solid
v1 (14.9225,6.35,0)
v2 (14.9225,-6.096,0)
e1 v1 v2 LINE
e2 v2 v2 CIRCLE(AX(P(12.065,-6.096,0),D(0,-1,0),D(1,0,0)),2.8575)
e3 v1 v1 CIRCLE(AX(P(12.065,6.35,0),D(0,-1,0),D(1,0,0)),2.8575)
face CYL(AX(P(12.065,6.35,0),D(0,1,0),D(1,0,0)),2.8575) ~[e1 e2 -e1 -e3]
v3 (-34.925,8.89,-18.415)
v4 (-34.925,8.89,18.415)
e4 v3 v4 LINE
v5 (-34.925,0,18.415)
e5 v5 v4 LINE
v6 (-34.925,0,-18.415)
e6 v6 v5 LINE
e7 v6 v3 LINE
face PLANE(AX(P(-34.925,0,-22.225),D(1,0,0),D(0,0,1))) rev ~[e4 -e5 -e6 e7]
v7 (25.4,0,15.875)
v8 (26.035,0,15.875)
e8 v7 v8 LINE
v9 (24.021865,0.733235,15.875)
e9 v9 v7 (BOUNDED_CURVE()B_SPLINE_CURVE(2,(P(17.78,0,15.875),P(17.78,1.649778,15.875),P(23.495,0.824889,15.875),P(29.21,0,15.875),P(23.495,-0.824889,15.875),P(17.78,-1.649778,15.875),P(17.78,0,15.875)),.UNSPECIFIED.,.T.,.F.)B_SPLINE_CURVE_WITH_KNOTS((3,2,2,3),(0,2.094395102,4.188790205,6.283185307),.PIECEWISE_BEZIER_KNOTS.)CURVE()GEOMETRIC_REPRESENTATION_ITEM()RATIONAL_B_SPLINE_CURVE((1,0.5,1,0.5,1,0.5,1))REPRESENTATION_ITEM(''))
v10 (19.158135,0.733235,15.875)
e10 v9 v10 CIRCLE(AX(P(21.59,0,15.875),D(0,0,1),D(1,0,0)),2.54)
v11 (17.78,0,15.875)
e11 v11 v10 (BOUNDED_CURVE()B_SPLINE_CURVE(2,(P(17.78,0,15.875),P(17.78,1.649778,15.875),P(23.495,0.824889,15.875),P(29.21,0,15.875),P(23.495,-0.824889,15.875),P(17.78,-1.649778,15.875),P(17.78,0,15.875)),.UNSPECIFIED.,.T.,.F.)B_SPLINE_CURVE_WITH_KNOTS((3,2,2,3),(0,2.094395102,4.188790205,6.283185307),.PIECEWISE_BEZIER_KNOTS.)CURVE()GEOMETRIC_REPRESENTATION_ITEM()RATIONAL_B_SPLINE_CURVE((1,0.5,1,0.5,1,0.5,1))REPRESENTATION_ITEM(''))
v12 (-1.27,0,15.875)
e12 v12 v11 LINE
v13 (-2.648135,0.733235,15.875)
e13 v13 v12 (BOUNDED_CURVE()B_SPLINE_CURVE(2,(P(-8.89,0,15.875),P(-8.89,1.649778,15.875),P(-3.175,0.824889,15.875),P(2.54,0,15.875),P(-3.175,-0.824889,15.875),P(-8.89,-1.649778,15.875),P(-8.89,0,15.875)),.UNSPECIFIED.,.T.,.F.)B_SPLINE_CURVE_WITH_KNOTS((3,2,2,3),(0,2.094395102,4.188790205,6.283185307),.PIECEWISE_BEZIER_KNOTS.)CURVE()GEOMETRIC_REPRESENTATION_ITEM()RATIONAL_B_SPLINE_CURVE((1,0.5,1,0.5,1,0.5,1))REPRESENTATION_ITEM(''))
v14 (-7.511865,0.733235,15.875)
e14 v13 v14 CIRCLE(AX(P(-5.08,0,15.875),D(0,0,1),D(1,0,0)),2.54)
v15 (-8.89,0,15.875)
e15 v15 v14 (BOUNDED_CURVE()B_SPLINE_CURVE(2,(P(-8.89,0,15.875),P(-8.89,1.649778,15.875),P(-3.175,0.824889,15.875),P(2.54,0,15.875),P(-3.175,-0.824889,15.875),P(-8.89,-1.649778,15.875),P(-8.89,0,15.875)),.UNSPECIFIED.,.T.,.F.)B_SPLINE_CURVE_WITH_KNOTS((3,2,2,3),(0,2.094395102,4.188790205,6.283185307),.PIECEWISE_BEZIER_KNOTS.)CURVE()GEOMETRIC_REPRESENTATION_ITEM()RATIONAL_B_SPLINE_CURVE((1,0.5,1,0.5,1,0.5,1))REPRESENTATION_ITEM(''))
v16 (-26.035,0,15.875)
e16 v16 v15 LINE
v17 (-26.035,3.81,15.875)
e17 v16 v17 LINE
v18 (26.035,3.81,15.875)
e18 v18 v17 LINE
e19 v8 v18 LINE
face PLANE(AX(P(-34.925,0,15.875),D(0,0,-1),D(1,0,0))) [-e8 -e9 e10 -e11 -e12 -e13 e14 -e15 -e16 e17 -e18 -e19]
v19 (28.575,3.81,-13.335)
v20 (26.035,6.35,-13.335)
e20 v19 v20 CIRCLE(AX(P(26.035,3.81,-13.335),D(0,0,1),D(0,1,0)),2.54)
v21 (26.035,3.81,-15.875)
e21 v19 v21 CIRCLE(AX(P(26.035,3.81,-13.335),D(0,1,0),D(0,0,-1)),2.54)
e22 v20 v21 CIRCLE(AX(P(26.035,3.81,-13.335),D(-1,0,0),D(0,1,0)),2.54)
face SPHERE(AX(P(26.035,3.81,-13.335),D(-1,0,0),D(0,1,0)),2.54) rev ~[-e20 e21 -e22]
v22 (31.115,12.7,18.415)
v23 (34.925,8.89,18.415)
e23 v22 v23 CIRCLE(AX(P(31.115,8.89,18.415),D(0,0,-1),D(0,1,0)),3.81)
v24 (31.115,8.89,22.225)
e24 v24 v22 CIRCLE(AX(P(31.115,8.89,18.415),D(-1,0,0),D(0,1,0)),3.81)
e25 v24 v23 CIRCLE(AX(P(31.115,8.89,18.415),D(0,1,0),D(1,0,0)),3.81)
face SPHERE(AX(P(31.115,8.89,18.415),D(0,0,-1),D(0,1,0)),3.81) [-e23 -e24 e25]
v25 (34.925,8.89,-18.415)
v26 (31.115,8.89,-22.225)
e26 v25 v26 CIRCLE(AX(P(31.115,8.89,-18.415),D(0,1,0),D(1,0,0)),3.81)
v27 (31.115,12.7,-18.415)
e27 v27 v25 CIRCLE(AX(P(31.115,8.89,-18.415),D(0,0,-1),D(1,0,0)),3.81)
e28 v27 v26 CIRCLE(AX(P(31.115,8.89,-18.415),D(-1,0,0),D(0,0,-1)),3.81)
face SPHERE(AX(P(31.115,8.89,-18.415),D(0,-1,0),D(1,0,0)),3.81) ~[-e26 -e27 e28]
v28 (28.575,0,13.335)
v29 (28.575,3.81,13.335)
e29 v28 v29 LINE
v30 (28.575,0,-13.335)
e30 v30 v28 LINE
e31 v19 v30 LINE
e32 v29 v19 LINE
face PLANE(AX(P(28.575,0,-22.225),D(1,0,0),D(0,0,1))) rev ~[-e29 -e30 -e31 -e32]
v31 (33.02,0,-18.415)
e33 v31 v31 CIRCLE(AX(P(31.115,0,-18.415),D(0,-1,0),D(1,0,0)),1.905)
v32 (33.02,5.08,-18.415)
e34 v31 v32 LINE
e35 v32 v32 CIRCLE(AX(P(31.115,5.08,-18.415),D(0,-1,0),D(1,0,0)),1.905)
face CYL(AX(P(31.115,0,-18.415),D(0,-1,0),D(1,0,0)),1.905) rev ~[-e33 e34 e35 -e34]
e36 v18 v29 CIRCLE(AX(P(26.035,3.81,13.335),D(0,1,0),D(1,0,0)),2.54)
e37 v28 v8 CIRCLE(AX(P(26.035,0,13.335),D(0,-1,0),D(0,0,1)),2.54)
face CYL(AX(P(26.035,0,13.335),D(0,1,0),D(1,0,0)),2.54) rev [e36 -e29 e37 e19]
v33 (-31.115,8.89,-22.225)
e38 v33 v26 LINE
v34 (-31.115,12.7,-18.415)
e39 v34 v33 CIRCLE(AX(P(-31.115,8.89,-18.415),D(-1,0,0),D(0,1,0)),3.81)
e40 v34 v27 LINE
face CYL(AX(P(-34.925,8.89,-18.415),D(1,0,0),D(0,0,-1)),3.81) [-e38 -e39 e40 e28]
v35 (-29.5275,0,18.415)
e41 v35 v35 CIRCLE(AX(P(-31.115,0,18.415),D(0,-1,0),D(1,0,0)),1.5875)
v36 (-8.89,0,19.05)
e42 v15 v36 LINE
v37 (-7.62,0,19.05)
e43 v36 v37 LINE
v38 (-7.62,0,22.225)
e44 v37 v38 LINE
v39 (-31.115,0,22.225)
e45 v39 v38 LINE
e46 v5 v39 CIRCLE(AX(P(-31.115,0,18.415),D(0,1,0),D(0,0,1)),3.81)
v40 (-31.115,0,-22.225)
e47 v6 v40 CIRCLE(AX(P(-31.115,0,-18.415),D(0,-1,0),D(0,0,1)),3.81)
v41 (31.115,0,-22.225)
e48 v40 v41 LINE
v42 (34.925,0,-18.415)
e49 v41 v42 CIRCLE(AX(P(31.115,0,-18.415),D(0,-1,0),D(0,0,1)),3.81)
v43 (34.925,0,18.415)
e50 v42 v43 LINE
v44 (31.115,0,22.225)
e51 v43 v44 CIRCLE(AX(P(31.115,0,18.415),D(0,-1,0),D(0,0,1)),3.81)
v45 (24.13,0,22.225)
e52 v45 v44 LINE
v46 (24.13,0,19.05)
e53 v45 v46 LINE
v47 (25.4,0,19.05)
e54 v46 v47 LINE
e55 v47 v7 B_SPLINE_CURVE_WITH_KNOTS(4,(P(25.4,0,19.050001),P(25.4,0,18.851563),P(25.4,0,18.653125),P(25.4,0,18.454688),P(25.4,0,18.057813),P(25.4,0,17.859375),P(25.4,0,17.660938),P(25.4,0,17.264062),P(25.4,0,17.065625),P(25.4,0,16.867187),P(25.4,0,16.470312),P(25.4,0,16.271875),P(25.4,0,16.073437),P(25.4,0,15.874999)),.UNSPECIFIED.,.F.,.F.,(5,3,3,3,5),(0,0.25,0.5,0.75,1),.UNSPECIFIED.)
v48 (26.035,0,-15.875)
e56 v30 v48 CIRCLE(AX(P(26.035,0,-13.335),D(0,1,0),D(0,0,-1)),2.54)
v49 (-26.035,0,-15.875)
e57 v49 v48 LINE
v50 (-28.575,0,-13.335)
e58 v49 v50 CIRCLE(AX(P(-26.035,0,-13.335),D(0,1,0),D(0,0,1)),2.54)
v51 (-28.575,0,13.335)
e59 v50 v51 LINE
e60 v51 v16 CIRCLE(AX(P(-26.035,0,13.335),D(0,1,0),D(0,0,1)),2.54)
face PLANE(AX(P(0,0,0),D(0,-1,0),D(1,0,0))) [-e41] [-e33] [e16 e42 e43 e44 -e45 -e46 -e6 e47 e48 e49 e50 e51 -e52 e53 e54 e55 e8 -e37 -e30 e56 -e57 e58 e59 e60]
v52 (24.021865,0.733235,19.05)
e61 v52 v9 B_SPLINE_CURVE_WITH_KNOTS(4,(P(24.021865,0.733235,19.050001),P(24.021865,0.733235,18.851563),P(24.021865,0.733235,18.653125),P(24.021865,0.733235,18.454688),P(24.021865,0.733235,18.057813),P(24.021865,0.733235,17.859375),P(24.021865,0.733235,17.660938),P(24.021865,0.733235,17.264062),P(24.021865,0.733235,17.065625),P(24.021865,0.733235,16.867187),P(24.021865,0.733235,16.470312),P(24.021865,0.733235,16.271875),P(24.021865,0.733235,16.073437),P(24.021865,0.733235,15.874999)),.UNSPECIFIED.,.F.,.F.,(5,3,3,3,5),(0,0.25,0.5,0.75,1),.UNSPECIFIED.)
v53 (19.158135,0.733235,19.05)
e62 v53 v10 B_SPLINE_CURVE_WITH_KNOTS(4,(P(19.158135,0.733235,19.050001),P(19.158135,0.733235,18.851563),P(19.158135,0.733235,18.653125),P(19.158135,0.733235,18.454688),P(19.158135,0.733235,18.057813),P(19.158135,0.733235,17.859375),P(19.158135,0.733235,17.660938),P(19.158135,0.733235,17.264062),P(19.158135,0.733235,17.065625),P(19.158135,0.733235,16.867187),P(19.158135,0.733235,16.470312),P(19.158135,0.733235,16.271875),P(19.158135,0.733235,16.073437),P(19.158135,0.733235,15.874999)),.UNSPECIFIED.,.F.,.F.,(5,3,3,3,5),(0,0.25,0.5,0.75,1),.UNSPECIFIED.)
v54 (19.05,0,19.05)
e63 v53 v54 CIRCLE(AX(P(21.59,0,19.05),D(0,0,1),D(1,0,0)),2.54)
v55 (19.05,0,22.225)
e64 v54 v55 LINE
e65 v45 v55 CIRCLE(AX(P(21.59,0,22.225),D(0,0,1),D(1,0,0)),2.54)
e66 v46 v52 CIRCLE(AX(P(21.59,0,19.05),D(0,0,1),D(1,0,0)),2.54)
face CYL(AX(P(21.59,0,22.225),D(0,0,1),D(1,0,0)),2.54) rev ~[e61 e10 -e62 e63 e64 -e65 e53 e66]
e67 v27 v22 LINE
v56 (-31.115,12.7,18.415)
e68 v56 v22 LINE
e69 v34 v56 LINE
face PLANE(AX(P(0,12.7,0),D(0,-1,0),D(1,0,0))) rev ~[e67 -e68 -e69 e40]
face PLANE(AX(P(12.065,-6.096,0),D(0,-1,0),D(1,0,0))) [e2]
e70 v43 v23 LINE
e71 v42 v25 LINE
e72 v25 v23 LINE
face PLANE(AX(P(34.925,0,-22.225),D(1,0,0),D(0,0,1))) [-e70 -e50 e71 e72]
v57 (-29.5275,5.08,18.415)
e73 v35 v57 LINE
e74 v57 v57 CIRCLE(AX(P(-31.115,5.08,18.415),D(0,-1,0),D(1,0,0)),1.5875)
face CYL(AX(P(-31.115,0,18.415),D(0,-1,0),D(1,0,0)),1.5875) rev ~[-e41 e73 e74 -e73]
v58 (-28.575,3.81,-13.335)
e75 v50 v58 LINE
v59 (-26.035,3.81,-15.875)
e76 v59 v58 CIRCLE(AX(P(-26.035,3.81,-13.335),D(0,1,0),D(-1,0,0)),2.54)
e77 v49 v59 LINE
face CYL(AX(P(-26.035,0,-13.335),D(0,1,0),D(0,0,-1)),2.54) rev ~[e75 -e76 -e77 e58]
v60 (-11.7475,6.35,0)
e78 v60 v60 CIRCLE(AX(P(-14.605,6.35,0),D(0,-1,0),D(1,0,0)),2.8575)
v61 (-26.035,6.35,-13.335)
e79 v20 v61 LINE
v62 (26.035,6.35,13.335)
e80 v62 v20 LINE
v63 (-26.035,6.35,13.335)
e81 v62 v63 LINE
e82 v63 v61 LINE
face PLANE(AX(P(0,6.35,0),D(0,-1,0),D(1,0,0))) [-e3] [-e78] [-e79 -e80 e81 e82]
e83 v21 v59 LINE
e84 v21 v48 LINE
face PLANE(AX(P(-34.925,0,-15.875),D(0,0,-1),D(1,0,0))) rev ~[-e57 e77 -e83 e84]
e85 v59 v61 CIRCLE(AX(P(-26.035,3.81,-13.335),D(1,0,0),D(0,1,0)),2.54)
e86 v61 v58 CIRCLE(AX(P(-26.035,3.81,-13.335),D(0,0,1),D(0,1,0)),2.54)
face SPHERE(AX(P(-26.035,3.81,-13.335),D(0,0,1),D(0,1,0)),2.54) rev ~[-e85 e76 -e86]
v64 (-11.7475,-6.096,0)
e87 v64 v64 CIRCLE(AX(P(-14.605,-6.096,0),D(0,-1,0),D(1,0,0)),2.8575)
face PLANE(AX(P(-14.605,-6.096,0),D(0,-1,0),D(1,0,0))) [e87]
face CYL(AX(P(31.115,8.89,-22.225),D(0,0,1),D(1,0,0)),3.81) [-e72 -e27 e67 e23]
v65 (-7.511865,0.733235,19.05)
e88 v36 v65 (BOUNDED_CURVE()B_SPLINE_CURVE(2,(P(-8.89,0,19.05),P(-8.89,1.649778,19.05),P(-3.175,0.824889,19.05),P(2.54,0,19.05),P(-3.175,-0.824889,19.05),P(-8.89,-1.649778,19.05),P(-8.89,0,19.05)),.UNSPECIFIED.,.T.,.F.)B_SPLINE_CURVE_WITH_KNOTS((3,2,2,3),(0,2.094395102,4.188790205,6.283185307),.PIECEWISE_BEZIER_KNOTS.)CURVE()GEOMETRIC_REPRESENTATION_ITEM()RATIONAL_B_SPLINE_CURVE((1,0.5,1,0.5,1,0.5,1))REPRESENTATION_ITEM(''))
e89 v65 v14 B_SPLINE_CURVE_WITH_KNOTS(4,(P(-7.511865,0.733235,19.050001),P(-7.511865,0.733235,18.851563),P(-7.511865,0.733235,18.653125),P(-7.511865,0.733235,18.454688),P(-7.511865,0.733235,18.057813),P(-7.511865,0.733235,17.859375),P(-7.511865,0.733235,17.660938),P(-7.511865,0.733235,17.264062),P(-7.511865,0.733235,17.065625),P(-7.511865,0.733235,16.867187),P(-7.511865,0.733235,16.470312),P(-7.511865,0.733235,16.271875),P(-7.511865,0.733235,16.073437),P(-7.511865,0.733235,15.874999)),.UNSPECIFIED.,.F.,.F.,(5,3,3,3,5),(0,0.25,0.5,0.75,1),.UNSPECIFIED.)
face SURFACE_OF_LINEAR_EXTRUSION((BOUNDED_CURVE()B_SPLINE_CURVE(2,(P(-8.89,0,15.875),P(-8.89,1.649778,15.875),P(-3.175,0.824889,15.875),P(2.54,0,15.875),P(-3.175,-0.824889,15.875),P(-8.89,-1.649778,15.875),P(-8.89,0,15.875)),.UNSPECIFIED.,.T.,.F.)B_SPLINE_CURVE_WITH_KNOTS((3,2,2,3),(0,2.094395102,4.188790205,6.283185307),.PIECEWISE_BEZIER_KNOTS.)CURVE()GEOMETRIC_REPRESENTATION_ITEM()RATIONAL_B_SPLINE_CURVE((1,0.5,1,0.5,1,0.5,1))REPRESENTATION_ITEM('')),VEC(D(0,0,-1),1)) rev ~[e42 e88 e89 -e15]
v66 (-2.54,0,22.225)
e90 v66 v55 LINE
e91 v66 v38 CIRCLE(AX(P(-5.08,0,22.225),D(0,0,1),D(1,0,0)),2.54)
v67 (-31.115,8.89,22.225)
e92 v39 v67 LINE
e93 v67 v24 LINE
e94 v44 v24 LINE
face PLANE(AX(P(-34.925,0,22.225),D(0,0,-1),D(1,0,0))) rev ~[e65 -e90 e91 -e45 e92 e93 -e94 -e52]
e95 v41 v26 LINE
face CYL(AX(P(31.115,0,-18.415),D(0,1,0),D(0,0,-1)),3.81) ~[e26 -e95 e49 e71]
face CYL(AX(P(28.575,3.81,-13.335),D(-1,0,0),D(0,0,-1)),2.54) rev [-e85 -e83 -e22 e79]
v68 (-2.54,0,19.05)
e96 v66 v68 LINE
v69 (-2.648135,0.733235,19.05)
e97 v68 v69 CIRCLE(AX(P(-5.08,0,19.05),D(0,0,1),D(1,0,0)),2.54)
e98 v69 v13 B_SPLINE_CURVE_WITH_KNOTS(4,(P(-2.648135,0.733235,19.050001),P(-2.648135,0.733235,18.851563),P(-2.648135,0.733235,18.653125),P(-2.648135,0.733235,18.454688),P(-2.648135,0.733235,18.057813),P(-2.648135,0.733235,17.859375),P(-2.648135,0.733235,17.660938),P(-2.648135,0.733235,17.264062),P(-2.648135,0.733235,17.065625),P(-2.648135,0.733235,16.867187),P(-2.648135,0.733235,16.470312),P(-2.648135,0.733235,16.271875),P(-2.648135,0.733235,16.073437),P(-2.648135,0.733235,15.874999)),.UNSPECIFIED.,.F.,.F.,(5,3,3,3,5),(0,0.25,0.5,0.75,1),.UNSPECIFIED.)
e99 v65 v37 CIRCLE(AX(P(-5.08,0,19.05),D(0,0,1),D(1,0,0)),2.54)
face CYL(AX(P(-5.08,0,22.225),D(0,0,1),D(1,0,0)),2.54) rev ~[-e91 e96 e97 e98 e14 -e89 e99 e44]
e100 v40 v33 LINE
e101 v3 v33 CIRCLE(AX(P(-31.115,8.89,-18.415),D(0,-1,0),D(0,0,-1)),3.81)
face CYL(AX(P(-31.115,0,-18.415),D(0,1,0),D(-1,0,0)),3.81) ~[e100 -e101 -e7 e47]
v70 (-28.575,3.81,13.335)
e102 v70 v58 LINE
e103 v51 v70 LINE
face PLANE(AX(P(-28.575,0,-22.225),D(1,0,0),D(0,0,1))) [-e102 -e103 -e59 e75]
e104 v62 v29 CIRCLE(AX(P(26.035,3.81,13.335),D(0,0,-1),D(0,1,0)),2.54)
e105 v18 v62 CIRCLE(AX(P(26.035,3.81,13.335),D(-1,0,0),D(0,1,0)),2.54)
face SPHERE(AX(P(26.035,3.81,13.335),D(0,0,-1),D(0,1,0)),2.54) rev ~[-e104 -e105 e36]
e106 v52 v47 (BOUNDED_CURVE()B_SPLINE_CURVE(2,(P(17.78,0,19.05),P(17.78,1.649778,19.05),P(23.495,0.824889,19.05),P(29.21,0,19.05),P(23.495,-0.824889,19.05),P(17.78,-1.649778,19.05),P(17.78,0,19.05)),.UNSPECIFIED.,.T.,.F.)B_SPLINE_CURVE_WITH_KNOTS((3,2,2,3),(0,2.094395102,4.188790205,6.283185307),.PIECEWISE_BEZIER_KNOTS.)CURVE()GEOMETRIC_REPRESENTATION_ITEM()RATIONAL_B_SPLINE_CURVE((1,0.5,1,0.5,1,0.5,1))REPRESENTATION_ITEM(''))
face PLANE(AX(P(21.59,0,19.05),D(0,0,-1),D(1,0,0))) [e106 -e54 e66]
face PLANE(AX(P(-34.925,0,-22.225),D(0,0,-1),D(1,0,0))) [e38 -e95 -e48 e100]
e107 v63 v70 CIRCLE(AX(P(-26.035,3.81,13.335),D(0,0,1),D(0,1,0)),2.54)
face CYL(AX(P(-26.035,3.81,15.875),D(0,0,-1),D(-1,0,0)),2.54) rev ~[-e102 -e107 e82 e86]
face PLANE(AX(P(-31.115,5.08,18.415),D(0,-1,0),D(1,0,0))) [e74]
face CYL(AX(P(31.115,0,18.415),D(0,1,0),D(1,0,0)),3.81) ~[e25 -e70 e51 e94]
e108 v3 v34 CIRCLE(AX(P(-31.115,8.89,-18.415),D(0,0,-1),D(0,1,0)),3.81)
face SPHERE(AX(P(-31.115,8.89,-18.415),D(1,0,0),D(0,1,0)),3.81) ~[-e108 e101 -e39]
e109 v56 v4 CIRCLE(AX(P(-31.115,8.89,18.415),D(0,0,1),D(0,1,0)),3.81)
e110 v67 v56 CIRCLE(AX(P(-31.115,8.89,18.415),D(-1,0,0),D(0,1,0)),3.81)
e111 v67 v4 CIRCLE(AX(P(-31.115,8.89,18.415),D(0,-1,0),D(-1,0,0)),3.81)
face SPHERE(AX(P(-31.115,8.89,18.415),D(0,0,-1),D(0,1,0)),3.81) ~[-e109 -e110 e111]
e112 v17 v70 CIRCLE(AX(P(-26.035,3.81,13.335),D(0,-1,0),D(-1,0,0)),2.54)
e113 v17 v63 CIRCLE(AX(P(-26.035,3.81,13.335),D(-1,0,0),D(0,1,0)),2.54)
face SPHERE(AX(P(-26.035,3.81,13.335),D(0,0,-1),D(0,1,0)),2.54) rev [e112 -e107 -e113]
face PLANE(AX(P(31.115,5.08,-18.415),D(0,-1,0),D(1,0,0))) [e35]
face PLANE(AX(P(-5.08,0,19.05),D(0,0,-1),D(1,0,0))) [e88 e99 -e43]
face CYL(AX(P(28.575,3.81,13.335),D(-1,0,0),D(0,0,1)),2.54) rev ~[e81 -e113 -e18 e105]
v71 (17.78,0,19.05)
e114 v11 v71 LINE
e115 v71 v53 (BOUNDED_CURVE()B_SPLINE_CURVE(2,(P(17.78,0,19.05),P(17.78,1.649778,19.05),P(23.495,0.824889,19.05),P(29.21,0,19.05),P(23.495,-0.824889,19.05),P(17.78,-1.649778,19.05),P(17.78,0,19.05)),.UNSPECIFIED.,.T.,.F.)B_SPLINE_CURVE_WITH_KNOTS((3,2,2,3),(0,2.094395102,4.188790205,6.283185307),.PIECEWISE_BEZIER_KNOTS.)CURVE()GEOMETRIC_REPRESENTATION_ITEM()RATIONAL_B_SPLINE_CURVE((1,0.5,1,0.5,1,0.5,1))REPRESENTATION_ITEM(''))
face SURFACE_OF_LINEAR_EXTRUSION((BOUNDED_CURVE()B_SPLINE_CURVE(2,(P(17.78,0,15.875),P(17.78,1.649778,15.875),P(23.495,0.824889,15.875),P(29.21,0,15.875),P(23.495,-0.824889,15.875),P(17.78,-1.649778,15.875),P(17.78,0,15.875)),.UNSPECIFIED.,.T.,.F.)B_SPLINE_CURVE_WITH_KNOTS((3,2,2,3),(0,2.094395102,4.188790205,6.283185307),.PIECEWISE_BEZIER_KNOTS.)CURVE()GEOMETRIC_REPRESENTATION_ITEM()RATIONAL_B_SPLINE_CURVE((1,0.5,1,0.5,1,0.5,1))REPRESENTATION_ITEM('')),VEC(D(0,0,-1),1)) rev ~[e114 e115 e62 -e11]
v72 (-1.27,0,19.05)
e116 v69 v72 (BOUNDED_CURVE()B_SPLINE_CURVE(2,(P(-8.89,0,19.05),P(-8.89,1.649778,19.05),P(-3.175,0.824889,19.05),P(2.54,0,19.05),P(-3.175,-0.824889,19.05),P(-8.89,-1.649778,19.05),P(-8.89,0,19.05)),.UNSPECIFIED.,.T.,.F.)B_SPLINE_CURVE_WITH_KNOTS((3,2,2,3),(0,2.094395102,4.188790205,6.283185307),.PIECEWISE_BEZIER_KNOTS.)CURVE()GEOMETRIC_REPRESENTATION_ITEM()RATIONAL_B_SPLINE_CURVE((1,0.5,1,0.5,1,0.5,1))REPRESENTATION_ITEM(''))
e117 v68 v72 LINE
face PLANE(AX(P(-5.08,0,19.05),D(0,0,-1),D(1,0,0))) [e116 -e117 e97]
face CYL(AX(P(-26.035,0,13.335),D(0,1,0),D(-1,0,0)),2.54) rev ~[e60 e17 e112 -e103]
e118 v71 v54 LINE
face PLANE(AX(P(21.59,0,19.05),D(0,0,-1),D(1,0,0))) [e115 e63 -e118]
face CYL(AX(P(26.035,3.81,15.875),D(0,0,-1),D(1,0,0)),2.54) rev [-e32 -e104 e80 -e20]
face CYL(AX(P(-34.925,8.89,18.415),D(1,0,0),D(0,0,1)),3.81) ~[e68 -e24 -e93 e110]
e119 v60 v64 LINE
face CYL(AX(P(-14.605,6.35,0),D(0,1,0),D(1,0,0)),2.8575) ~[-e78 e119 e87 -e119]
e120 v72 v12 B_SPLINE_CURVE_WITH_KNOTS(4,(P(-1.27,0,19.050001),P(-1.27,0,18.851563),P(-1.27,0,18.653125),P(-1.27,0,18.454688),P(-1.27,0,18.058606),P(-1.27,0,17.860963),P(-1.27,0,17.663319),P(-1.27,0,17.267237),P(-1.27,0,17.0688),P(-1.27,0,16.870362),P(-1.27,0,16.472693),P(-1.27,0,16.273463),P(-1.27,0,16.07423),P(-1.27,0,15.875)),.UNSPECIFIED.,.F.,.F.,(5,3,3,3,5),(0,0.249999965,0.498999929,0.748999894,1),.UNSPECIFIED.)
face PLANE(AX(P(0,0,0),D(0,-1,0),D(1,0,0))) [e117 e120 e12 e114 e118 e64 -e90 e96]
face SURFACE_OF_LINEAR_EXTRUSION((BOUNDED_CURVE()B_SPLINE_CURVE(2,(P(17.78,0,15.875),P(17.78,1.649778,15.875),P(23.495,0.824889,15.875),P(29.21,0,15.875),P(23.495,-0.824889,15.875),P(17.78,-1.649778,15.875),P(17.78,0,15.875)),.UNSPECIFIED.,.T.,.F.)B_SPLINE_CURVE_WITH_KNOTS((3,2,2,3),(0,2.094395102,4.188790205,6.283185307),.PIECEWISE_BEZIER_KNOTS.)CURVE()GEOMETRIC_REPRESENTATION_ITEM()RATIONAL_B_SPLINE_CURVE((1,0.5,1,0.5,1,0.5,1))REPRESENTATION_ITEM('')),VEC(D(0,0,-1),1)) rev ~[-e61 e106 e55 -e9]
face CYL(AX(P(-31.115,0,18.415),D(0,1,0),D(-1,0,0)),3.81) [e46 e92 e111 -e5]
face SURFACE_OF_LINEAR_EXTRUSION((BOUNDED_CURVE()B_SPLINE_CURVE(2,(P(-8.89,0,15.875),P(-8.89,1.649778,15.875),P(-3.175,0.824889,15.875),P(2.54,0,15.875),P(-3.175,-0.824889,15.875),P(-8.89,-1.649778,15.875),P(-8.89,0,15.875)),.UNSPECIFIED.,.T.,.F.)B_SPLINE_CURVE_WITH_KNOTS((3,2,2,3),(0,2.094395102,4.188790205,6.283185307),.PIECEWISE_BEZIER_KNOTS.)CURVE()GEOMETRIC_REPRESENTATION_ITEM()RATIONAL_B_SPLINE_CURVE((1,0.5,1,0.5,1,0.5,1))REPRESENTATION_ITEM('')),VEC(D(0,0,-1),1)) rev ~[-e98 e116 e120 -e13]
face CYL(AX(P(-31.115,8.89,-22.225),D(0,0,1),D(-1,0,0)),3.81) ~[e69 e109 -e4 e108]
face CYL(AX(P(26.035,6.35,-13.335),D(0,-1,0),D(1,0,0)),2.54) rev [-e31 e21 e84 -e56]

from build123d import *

# Parameters (mm, degrees)
F0_W      = 69.85
F0_H      = 44.45
F1_DEPTH  = 12.7
F2_T      = -6.35
F3_R      = 3.81
F4_R      = 2.54
F5_R      = 1.5875
F5_R_2    = 1.905
F6_DEPTH  = 5.08
F7_R      = 2.8575
F8_DEPTH  = 12.446
F9_R      = 2.54
F10_DEPTH = 6.35
F12_DEPTH = 3.175


# Not quite as in the source:
# - a feature names something its author has since deleted; it is built from what else it names


with BuildPart() as f1:
    # F0 (on Front) → F1 (new body)
    with BuildSketch(Plane.XZ):
        Rectangle(F0_W, F0_H)
    extrude(amount=-F1_DEPTH)

    # F2
    f2_openings = [f1.faces().sort_by_distance(p)[0] for p in [
        (0, 0, 0),
    ]]
    offset(amount=F2_T, openings=f2_openings)

    # F3
    f3_edges = [f1.edges().sort_by_distance(p)[0] for p in [
        (34.925, 6.35, -22.225),
        (34.925, 12.7, 0),
        (0, 12.7, -22.225),
        (-34.925, 12.7, 0),
        (0, 12.7, 22.225),
        (-34.925, 6.35, 22.225),
        (34.925, 6.35, 22.225),
        (-34.925, 6.35, -22.225),
    ]]
    fillet(f3_edges, radius=F3_R)

    # F4
    f4_edges = [f1.edges().sort_by_distance(p)[0] for p in [
        (-28.575, 6.35, 0),
        (0, 6.35, -15.875),
        (28.575, 6.35, 0),
        (0, 6.35, 15.875),
        (-28.575, 3.175, -15.875),
        (28.575, 3.175, -15.875),
        (28.575, 3.175, 15.875),
        (-28.575, 3.175, 15.875),
    ]]
    fillet(f4_edges, radius=F4_R)

    # F5 (on face) → F6 (cut)
    with BuildSketch(Plane.XZ):
        with Locations((-31.115, 18.415)):
            Circle(F5_R)
        with Locations((31.115, -18.415)):
            Circle(F5_R_2)
    extrude(amount=-F6_DEPTH, mode=Mode.SUBTRACT)

    # F7 (on face) → F8 (join)
    with BuildSketch(Plane.XZ.offset(-6.35)):
        with Locations((-14.605, 0)):
            Circle(F7_R)
        with Locations((12.065, 0)):
            Circle(F7_R)
    extrude(amount=F8_DEPTH)

    # F9 (on face) → F10 (cut, through all)
    with BuildSketch(Plane.XY.offset(22.225)):
        with Locations((-5.08, 0)):
            Circle(F9_R)
        with Locations((21.59, 0)):
            Circle(F9_R)
    extrude(amount=-F10_DEPTH, mode=Mode.SUBTRACT)

    # F11 (on face) → F12 (cut)
    with BuildSketch(Plane(origin=(0, 0, 15.875), x_dir=(1, 0, 0), z_dir=(0, 0, -1))):
        with BuildLine():
            add(Edge.make_bspline(
                [(-8.89, 0), (-8.89, -1.6497783942), (-3.175, -0.8248891971), (2.54, 0), (-3.175, 0.8248891971), (-8.89, 1.6497783942), (-8.89, 0)],
                knots=[0, 0, 0, 2.0943951024, 2.0943951024, 4.1887902048, 4.1887902048, 6.2831853072, 6.2831853072, 6.2831853072], degree=2, weights=[1, 0.5, 1, 0.5, 1, 0.5, 1]))
        make_face()
        with BuildLine():
            add(Edge.make_bspline(
                [(17.78, 0), (17.78, -1.6497783942), (23.495, -0.8248891971), (29.21, 0), (23.495, 0.8248891971), (17.78, 1.6497783942), (17.78, 0)],
                knots=[0, 0, 0, 2.0943951024, 2.0943951024, 4.1887902048, 4.1887902048, 6.2831853072, 6.2831853072, 6.2831853072], degree=2, weights=[1, 0.5, 1, 0.5, 1, 0.5, 1]))
        make_face()
    extrude(amount=-F12_DEPTH, mode=Mode.SUBTRACT)


solid = f1.part
